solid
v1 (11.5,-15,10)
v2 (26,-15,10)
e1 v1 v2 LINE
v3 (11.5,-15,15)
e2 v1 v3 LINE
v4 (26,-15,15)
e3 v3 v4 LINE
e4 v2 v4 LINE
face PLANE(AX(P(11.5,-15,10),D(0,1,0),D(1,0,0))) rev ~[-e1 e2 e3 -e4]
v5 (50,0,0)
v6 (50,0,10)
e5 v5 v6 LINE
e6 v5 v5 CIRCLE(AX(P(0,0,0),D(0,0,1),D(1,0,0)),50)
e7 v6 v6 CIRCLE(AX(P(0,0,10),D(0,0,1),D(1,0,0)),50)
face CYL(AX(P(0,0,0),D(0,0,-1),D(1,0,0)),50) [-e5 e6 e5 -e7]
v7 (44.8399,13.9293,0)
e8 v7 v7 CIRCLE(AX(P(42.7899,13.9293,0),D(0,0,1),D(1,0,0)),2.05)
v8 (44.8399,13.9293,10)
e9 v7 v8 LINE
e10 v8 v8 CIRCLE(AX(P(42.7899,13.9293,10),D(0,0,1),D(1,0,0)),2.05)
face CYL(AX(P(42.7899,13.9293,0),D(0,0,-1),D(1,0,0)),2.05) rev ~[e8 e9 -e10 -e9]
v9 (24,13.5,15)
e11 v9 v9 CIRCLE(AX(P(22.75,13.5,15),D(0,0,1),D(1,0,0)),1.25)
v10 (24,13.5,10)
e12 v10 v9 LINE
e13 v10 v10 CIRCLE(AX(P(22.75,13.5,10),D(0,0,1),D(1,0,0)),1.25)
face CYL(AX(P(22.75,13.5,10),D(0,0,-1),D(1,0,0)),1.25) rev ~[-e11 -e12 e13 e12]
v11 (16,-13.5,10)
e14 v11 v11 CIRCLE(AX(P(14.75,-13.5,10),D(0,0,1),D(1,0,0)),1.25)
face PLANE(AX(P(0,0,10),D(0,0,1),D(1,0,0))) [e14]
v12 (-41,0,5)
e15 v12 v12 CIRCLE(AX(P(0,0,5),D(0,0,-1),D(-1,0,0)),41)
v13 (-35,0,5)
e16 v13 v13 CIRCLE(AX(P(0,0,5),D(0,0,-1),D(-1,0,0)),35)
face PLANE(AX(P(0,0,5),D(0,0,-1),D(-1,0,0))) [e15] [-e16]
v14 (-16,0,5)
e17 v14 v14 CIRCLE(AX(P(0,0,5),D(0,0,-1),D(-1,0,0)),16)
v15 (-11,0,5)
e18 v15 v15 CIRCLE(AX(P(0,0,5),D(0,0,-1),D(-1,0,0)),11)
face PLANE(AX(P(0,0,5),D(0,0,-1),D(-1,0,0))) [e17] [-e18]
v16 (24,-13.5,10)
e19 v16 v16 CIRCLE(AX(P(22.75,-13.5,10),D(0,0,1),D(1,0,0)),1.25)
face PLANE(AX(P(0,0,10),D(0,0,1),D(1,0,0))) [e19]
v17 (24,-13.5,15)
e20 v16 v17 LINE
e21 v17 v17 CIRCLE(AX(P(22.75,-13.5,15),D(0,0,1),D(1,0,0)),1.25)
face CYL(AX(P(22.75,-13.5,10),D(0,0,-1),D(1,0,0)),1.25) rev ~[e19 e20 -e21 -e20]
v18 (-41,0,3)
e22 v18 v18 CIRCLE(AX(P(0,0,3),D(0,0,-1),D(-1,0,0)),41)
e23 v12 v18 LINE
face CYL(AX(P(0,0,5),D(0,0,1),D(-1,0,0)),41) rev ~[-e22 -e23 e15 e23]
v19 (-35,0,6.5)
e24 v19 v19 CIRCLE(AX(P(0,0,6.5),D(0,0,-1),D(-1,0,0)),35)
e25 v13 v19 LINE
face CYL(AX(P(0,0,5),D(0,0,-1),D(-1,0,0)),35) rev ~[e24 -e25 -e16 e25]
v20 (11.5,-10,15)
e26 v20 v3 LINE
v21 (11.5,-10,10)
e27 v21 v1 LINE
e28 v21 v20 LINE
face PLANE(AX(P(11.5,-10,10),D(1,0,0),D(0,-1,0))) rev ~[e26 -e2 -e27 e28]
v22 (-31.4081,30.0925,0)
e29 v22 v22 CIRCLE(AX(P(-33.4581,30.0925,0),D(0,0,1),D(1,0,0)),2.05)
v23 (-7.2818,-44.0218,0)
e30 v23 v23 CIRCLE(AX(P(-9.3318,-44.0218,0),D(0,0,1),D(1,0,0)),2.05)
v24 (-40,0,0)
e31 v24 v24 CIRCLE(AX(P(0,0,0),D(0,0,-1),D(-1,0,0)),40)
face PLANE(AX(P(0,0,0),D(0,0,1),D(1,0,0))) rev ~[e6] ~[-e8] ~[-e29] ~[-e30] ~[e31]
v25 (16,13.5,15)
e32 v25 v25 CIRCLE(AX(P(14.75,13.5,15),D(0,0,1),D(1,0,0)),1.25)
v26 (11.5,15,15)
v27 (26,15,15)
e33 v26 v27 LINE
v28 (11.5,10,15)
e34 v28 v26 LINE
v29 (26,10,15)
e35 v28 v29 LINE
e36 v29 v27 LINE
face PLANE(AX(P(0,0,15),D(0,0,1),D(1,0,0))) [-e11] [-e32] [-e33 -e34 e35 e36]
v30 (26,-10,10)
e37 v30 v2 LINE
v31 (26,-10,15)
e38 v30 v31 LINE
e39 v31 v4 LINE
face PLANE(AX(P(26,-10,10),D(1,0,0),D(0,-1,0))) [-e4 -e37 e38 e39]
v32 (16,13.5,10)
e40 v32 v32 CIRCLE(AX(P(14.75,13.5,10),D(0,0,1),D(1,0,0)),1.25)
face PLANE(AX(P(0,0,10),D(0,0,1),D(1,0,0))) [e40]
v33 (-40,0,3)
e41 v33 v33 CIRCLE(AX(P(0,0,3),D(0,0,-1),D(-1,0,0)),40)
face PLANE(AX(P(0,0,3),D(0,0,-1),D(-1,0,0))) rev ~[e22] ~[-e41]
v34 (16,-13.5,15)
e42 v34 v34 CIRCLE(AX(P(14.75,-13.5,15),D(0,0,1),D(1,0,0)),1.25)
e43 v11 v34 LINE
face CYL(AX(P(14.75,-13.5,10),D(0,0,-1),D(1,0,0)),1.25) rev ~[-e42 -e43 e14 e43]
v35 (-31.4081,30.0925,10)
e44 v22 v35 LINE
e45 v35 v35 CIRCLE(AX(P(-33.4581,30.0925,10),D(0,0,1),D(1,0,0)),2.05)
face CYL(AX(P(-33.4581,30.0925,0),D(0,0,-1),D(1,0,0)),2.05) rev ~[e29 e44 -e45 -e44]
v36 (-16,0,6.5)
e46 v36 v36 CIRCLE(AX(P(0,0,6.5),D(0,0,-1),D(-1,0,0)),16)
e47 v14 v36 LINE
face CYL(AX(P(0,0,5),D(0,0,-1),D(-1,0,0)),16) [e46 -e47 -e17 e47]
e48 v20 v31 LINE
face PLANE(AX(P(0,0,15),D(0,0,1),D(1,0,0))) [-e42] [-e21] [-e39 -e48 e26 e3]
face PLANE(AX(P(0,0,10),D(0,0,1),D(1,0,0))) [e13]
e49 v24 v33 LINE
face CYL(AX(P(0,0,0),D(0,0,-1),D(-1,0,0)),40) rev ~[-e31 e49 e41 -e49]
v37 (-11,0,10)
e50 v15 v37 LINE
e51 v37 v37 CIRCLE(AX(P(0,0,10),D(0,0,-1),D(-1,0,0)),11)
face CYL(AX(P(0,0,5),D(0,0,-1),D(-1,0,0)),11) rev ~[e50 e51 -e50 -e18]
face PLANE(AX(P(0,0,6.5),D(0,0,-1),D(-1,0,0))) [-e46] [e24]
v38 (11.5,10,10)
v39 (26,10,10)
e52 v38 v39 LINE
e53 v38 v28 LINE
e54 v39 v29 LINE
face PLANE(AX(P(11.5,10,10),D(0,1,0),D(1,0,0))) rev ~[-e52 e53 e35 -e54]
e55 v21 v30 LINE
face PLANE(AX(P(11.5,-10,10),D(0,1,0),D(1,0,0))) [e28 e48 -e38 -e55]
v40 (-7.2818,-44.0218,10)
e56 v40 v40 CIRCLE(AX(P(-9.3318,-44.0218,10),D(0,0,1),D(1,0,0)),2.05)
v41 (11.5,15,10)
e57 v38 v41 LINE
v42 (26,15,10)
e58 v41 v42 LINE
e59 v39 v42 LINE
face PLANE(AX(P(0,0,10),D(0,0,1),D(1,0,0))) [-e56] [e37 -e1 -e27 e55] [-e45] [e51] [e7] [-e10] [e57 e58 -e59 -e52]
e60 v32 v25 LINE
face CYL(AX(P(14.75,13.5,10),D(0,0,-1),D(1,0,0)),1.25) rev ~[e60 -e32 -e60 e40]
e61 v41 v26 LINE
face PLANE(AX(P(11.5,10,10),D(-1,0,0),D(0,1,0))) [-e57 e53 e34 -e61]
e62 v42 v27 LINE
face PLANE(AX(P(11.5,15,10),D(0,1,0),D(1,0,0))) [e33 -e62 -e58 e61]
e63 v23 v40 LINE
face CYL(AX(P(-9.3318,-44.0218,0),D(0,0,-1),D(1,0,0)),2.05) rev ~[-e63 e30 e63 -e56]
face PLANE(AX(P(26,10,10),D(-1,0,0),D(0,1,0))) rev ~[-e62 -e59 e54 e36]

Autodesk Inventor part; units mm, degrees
ref_plane "YZ Plane" through (0, 0, 0) normal (1, 0, 0) x (0, 1, 0)
ref_plane "XZ Plane" through (0, 0, 0) normal (0, 1, 0) x (-1, 0, 0)
ref_plane "XY Plane" through (0, 0, 0) normal (0, 0, 1) x (1, 0, 0)
sketch "スケッチ1" plane through (0, 0, 0) normal (0, 0, 1) x (1, 0, 0)
  circle A0 centre (0, 0) radius 50
  circle A1 centre (0, 0) radius 40
  circle A2 centre (-33.4581, 30.0925) radius 2.05
  circle A3 centre (-9.3318, -44.0218) radius 2.05
  circle A4 centre (42.7899, 13.9293) radius 2.05
  dimension "d0" = 100
  dimension "d1" = 80
  dimension "d2" = 4.1
  dimension "d4" = 45
  dimension "d7" = 360
extrude "押し出し1" add sketch "スケッチ1" along normal blind 10 contours A0 | A1
sketch "スケッチ2" plane through (0, 0, 0) normal (0, 0, -1) x (-1, 0, 0)
  circle A0 centre (0, 0) radius 50
  circle A1 centre (0, 0) radius 40
  circle A2 centre (-33.4581, 30.0925) radius 2.05
  circle A3 centre (-9.3318, -44.0218) radius 2.05
  circle A4 centre (42.7899, 13.9293) radius 2.05
  dimension "d13" = 100
  dimension "d14" = 80
  dimension "d17" = 360
extrude "押し出し2" cut sketch "スケッチ2" against normal blind 5 contours A1
sketch "スケッチ3" plane through (0, 0, 5) normal (0, 0, -1) x (-1, 0, 0)
  circle A0 centre (0, 0) radius 41
  circle A1 centre (0, 0) radius 40
  dimension "d21" = 80
  dimension "d22" = 82
extrude "押し出し3" cut sketch "スケッチ3" along normal blind 2
sketch "スケッチ4" plane through (0, 0, 5) normal (0, 0, -1) x (-1, 0, 0)
  circle A0 centre (0, 0) radius 35
  circle A1 centre (0, 0) radius 16
  dimension "d27" = 70
  dimension "d28" = 32
extrude "押し出し4" cut sketch "スケッチ4" against normal blind 1.5
sketch "スケッチ5" plane through (0, 0, 5) normal (0, 0, -1) x (-1, 0, 0)
  circle A0 centre (0, 0) radius 11
  dimension "d31" = 22
extrude "押し出し5" cut sketch "スケッチ5" against normal blind 5
sketch "スケッチ8" plane through (0, 0, 10) normal (0, 0, 1) x (1, 0, 0)
  circle A0 centre (0, 0) radius 11
  line L0 (0, 0) -> (3.5, 0)
  line L1 (11.5, 10) -> (11.5, 15)
  line L2 (11.5, 15) -> (26, 15)
  line L3 (11.5, 10) -> (26, 10)
  line L4 (26, 10) -> (26, 15)
  circle A1 centre (14.75, 13.5) radius 1.25
  circle A2 centre (22.75, 13.5) radius 1.25
  line L5 (-70, 0) -> (70, 0)
  line L6 (11.5, -10) -> (11.5, -15)
  line L7 (11.5, -15) -> (26, -15)
  line L8 (11.5, -10) -> (26, -10)
  line L9 (26, -10) -> (26, -15)
  circle A3 centre (14.75, -13.5) radius 1.25
  circle A4 centre (22.75, -13.5) radius 1.25
  line L10 (0, -70) -> (0, 70) projected
  line L11 (-98, 0) -> (98, 0) projected
  dimension "d54" = 5
  dimension "d55" = 14.5
  dimension "d56" = 2.5
  dimension "d57" = 3.25
  dimension "d58" = 1.5
  dimension "d59" = 2.5
  dimension "d60" = 3.25
  dimension "d64" = 27
  dimension "d65" = 11.5
extrude "押し出し7" add sketch "スケッチ8" along normal blind 5 contours L1 L2 L4 L3 | L8 L9 L7 L6
properties part number "rotate_plate_3"
